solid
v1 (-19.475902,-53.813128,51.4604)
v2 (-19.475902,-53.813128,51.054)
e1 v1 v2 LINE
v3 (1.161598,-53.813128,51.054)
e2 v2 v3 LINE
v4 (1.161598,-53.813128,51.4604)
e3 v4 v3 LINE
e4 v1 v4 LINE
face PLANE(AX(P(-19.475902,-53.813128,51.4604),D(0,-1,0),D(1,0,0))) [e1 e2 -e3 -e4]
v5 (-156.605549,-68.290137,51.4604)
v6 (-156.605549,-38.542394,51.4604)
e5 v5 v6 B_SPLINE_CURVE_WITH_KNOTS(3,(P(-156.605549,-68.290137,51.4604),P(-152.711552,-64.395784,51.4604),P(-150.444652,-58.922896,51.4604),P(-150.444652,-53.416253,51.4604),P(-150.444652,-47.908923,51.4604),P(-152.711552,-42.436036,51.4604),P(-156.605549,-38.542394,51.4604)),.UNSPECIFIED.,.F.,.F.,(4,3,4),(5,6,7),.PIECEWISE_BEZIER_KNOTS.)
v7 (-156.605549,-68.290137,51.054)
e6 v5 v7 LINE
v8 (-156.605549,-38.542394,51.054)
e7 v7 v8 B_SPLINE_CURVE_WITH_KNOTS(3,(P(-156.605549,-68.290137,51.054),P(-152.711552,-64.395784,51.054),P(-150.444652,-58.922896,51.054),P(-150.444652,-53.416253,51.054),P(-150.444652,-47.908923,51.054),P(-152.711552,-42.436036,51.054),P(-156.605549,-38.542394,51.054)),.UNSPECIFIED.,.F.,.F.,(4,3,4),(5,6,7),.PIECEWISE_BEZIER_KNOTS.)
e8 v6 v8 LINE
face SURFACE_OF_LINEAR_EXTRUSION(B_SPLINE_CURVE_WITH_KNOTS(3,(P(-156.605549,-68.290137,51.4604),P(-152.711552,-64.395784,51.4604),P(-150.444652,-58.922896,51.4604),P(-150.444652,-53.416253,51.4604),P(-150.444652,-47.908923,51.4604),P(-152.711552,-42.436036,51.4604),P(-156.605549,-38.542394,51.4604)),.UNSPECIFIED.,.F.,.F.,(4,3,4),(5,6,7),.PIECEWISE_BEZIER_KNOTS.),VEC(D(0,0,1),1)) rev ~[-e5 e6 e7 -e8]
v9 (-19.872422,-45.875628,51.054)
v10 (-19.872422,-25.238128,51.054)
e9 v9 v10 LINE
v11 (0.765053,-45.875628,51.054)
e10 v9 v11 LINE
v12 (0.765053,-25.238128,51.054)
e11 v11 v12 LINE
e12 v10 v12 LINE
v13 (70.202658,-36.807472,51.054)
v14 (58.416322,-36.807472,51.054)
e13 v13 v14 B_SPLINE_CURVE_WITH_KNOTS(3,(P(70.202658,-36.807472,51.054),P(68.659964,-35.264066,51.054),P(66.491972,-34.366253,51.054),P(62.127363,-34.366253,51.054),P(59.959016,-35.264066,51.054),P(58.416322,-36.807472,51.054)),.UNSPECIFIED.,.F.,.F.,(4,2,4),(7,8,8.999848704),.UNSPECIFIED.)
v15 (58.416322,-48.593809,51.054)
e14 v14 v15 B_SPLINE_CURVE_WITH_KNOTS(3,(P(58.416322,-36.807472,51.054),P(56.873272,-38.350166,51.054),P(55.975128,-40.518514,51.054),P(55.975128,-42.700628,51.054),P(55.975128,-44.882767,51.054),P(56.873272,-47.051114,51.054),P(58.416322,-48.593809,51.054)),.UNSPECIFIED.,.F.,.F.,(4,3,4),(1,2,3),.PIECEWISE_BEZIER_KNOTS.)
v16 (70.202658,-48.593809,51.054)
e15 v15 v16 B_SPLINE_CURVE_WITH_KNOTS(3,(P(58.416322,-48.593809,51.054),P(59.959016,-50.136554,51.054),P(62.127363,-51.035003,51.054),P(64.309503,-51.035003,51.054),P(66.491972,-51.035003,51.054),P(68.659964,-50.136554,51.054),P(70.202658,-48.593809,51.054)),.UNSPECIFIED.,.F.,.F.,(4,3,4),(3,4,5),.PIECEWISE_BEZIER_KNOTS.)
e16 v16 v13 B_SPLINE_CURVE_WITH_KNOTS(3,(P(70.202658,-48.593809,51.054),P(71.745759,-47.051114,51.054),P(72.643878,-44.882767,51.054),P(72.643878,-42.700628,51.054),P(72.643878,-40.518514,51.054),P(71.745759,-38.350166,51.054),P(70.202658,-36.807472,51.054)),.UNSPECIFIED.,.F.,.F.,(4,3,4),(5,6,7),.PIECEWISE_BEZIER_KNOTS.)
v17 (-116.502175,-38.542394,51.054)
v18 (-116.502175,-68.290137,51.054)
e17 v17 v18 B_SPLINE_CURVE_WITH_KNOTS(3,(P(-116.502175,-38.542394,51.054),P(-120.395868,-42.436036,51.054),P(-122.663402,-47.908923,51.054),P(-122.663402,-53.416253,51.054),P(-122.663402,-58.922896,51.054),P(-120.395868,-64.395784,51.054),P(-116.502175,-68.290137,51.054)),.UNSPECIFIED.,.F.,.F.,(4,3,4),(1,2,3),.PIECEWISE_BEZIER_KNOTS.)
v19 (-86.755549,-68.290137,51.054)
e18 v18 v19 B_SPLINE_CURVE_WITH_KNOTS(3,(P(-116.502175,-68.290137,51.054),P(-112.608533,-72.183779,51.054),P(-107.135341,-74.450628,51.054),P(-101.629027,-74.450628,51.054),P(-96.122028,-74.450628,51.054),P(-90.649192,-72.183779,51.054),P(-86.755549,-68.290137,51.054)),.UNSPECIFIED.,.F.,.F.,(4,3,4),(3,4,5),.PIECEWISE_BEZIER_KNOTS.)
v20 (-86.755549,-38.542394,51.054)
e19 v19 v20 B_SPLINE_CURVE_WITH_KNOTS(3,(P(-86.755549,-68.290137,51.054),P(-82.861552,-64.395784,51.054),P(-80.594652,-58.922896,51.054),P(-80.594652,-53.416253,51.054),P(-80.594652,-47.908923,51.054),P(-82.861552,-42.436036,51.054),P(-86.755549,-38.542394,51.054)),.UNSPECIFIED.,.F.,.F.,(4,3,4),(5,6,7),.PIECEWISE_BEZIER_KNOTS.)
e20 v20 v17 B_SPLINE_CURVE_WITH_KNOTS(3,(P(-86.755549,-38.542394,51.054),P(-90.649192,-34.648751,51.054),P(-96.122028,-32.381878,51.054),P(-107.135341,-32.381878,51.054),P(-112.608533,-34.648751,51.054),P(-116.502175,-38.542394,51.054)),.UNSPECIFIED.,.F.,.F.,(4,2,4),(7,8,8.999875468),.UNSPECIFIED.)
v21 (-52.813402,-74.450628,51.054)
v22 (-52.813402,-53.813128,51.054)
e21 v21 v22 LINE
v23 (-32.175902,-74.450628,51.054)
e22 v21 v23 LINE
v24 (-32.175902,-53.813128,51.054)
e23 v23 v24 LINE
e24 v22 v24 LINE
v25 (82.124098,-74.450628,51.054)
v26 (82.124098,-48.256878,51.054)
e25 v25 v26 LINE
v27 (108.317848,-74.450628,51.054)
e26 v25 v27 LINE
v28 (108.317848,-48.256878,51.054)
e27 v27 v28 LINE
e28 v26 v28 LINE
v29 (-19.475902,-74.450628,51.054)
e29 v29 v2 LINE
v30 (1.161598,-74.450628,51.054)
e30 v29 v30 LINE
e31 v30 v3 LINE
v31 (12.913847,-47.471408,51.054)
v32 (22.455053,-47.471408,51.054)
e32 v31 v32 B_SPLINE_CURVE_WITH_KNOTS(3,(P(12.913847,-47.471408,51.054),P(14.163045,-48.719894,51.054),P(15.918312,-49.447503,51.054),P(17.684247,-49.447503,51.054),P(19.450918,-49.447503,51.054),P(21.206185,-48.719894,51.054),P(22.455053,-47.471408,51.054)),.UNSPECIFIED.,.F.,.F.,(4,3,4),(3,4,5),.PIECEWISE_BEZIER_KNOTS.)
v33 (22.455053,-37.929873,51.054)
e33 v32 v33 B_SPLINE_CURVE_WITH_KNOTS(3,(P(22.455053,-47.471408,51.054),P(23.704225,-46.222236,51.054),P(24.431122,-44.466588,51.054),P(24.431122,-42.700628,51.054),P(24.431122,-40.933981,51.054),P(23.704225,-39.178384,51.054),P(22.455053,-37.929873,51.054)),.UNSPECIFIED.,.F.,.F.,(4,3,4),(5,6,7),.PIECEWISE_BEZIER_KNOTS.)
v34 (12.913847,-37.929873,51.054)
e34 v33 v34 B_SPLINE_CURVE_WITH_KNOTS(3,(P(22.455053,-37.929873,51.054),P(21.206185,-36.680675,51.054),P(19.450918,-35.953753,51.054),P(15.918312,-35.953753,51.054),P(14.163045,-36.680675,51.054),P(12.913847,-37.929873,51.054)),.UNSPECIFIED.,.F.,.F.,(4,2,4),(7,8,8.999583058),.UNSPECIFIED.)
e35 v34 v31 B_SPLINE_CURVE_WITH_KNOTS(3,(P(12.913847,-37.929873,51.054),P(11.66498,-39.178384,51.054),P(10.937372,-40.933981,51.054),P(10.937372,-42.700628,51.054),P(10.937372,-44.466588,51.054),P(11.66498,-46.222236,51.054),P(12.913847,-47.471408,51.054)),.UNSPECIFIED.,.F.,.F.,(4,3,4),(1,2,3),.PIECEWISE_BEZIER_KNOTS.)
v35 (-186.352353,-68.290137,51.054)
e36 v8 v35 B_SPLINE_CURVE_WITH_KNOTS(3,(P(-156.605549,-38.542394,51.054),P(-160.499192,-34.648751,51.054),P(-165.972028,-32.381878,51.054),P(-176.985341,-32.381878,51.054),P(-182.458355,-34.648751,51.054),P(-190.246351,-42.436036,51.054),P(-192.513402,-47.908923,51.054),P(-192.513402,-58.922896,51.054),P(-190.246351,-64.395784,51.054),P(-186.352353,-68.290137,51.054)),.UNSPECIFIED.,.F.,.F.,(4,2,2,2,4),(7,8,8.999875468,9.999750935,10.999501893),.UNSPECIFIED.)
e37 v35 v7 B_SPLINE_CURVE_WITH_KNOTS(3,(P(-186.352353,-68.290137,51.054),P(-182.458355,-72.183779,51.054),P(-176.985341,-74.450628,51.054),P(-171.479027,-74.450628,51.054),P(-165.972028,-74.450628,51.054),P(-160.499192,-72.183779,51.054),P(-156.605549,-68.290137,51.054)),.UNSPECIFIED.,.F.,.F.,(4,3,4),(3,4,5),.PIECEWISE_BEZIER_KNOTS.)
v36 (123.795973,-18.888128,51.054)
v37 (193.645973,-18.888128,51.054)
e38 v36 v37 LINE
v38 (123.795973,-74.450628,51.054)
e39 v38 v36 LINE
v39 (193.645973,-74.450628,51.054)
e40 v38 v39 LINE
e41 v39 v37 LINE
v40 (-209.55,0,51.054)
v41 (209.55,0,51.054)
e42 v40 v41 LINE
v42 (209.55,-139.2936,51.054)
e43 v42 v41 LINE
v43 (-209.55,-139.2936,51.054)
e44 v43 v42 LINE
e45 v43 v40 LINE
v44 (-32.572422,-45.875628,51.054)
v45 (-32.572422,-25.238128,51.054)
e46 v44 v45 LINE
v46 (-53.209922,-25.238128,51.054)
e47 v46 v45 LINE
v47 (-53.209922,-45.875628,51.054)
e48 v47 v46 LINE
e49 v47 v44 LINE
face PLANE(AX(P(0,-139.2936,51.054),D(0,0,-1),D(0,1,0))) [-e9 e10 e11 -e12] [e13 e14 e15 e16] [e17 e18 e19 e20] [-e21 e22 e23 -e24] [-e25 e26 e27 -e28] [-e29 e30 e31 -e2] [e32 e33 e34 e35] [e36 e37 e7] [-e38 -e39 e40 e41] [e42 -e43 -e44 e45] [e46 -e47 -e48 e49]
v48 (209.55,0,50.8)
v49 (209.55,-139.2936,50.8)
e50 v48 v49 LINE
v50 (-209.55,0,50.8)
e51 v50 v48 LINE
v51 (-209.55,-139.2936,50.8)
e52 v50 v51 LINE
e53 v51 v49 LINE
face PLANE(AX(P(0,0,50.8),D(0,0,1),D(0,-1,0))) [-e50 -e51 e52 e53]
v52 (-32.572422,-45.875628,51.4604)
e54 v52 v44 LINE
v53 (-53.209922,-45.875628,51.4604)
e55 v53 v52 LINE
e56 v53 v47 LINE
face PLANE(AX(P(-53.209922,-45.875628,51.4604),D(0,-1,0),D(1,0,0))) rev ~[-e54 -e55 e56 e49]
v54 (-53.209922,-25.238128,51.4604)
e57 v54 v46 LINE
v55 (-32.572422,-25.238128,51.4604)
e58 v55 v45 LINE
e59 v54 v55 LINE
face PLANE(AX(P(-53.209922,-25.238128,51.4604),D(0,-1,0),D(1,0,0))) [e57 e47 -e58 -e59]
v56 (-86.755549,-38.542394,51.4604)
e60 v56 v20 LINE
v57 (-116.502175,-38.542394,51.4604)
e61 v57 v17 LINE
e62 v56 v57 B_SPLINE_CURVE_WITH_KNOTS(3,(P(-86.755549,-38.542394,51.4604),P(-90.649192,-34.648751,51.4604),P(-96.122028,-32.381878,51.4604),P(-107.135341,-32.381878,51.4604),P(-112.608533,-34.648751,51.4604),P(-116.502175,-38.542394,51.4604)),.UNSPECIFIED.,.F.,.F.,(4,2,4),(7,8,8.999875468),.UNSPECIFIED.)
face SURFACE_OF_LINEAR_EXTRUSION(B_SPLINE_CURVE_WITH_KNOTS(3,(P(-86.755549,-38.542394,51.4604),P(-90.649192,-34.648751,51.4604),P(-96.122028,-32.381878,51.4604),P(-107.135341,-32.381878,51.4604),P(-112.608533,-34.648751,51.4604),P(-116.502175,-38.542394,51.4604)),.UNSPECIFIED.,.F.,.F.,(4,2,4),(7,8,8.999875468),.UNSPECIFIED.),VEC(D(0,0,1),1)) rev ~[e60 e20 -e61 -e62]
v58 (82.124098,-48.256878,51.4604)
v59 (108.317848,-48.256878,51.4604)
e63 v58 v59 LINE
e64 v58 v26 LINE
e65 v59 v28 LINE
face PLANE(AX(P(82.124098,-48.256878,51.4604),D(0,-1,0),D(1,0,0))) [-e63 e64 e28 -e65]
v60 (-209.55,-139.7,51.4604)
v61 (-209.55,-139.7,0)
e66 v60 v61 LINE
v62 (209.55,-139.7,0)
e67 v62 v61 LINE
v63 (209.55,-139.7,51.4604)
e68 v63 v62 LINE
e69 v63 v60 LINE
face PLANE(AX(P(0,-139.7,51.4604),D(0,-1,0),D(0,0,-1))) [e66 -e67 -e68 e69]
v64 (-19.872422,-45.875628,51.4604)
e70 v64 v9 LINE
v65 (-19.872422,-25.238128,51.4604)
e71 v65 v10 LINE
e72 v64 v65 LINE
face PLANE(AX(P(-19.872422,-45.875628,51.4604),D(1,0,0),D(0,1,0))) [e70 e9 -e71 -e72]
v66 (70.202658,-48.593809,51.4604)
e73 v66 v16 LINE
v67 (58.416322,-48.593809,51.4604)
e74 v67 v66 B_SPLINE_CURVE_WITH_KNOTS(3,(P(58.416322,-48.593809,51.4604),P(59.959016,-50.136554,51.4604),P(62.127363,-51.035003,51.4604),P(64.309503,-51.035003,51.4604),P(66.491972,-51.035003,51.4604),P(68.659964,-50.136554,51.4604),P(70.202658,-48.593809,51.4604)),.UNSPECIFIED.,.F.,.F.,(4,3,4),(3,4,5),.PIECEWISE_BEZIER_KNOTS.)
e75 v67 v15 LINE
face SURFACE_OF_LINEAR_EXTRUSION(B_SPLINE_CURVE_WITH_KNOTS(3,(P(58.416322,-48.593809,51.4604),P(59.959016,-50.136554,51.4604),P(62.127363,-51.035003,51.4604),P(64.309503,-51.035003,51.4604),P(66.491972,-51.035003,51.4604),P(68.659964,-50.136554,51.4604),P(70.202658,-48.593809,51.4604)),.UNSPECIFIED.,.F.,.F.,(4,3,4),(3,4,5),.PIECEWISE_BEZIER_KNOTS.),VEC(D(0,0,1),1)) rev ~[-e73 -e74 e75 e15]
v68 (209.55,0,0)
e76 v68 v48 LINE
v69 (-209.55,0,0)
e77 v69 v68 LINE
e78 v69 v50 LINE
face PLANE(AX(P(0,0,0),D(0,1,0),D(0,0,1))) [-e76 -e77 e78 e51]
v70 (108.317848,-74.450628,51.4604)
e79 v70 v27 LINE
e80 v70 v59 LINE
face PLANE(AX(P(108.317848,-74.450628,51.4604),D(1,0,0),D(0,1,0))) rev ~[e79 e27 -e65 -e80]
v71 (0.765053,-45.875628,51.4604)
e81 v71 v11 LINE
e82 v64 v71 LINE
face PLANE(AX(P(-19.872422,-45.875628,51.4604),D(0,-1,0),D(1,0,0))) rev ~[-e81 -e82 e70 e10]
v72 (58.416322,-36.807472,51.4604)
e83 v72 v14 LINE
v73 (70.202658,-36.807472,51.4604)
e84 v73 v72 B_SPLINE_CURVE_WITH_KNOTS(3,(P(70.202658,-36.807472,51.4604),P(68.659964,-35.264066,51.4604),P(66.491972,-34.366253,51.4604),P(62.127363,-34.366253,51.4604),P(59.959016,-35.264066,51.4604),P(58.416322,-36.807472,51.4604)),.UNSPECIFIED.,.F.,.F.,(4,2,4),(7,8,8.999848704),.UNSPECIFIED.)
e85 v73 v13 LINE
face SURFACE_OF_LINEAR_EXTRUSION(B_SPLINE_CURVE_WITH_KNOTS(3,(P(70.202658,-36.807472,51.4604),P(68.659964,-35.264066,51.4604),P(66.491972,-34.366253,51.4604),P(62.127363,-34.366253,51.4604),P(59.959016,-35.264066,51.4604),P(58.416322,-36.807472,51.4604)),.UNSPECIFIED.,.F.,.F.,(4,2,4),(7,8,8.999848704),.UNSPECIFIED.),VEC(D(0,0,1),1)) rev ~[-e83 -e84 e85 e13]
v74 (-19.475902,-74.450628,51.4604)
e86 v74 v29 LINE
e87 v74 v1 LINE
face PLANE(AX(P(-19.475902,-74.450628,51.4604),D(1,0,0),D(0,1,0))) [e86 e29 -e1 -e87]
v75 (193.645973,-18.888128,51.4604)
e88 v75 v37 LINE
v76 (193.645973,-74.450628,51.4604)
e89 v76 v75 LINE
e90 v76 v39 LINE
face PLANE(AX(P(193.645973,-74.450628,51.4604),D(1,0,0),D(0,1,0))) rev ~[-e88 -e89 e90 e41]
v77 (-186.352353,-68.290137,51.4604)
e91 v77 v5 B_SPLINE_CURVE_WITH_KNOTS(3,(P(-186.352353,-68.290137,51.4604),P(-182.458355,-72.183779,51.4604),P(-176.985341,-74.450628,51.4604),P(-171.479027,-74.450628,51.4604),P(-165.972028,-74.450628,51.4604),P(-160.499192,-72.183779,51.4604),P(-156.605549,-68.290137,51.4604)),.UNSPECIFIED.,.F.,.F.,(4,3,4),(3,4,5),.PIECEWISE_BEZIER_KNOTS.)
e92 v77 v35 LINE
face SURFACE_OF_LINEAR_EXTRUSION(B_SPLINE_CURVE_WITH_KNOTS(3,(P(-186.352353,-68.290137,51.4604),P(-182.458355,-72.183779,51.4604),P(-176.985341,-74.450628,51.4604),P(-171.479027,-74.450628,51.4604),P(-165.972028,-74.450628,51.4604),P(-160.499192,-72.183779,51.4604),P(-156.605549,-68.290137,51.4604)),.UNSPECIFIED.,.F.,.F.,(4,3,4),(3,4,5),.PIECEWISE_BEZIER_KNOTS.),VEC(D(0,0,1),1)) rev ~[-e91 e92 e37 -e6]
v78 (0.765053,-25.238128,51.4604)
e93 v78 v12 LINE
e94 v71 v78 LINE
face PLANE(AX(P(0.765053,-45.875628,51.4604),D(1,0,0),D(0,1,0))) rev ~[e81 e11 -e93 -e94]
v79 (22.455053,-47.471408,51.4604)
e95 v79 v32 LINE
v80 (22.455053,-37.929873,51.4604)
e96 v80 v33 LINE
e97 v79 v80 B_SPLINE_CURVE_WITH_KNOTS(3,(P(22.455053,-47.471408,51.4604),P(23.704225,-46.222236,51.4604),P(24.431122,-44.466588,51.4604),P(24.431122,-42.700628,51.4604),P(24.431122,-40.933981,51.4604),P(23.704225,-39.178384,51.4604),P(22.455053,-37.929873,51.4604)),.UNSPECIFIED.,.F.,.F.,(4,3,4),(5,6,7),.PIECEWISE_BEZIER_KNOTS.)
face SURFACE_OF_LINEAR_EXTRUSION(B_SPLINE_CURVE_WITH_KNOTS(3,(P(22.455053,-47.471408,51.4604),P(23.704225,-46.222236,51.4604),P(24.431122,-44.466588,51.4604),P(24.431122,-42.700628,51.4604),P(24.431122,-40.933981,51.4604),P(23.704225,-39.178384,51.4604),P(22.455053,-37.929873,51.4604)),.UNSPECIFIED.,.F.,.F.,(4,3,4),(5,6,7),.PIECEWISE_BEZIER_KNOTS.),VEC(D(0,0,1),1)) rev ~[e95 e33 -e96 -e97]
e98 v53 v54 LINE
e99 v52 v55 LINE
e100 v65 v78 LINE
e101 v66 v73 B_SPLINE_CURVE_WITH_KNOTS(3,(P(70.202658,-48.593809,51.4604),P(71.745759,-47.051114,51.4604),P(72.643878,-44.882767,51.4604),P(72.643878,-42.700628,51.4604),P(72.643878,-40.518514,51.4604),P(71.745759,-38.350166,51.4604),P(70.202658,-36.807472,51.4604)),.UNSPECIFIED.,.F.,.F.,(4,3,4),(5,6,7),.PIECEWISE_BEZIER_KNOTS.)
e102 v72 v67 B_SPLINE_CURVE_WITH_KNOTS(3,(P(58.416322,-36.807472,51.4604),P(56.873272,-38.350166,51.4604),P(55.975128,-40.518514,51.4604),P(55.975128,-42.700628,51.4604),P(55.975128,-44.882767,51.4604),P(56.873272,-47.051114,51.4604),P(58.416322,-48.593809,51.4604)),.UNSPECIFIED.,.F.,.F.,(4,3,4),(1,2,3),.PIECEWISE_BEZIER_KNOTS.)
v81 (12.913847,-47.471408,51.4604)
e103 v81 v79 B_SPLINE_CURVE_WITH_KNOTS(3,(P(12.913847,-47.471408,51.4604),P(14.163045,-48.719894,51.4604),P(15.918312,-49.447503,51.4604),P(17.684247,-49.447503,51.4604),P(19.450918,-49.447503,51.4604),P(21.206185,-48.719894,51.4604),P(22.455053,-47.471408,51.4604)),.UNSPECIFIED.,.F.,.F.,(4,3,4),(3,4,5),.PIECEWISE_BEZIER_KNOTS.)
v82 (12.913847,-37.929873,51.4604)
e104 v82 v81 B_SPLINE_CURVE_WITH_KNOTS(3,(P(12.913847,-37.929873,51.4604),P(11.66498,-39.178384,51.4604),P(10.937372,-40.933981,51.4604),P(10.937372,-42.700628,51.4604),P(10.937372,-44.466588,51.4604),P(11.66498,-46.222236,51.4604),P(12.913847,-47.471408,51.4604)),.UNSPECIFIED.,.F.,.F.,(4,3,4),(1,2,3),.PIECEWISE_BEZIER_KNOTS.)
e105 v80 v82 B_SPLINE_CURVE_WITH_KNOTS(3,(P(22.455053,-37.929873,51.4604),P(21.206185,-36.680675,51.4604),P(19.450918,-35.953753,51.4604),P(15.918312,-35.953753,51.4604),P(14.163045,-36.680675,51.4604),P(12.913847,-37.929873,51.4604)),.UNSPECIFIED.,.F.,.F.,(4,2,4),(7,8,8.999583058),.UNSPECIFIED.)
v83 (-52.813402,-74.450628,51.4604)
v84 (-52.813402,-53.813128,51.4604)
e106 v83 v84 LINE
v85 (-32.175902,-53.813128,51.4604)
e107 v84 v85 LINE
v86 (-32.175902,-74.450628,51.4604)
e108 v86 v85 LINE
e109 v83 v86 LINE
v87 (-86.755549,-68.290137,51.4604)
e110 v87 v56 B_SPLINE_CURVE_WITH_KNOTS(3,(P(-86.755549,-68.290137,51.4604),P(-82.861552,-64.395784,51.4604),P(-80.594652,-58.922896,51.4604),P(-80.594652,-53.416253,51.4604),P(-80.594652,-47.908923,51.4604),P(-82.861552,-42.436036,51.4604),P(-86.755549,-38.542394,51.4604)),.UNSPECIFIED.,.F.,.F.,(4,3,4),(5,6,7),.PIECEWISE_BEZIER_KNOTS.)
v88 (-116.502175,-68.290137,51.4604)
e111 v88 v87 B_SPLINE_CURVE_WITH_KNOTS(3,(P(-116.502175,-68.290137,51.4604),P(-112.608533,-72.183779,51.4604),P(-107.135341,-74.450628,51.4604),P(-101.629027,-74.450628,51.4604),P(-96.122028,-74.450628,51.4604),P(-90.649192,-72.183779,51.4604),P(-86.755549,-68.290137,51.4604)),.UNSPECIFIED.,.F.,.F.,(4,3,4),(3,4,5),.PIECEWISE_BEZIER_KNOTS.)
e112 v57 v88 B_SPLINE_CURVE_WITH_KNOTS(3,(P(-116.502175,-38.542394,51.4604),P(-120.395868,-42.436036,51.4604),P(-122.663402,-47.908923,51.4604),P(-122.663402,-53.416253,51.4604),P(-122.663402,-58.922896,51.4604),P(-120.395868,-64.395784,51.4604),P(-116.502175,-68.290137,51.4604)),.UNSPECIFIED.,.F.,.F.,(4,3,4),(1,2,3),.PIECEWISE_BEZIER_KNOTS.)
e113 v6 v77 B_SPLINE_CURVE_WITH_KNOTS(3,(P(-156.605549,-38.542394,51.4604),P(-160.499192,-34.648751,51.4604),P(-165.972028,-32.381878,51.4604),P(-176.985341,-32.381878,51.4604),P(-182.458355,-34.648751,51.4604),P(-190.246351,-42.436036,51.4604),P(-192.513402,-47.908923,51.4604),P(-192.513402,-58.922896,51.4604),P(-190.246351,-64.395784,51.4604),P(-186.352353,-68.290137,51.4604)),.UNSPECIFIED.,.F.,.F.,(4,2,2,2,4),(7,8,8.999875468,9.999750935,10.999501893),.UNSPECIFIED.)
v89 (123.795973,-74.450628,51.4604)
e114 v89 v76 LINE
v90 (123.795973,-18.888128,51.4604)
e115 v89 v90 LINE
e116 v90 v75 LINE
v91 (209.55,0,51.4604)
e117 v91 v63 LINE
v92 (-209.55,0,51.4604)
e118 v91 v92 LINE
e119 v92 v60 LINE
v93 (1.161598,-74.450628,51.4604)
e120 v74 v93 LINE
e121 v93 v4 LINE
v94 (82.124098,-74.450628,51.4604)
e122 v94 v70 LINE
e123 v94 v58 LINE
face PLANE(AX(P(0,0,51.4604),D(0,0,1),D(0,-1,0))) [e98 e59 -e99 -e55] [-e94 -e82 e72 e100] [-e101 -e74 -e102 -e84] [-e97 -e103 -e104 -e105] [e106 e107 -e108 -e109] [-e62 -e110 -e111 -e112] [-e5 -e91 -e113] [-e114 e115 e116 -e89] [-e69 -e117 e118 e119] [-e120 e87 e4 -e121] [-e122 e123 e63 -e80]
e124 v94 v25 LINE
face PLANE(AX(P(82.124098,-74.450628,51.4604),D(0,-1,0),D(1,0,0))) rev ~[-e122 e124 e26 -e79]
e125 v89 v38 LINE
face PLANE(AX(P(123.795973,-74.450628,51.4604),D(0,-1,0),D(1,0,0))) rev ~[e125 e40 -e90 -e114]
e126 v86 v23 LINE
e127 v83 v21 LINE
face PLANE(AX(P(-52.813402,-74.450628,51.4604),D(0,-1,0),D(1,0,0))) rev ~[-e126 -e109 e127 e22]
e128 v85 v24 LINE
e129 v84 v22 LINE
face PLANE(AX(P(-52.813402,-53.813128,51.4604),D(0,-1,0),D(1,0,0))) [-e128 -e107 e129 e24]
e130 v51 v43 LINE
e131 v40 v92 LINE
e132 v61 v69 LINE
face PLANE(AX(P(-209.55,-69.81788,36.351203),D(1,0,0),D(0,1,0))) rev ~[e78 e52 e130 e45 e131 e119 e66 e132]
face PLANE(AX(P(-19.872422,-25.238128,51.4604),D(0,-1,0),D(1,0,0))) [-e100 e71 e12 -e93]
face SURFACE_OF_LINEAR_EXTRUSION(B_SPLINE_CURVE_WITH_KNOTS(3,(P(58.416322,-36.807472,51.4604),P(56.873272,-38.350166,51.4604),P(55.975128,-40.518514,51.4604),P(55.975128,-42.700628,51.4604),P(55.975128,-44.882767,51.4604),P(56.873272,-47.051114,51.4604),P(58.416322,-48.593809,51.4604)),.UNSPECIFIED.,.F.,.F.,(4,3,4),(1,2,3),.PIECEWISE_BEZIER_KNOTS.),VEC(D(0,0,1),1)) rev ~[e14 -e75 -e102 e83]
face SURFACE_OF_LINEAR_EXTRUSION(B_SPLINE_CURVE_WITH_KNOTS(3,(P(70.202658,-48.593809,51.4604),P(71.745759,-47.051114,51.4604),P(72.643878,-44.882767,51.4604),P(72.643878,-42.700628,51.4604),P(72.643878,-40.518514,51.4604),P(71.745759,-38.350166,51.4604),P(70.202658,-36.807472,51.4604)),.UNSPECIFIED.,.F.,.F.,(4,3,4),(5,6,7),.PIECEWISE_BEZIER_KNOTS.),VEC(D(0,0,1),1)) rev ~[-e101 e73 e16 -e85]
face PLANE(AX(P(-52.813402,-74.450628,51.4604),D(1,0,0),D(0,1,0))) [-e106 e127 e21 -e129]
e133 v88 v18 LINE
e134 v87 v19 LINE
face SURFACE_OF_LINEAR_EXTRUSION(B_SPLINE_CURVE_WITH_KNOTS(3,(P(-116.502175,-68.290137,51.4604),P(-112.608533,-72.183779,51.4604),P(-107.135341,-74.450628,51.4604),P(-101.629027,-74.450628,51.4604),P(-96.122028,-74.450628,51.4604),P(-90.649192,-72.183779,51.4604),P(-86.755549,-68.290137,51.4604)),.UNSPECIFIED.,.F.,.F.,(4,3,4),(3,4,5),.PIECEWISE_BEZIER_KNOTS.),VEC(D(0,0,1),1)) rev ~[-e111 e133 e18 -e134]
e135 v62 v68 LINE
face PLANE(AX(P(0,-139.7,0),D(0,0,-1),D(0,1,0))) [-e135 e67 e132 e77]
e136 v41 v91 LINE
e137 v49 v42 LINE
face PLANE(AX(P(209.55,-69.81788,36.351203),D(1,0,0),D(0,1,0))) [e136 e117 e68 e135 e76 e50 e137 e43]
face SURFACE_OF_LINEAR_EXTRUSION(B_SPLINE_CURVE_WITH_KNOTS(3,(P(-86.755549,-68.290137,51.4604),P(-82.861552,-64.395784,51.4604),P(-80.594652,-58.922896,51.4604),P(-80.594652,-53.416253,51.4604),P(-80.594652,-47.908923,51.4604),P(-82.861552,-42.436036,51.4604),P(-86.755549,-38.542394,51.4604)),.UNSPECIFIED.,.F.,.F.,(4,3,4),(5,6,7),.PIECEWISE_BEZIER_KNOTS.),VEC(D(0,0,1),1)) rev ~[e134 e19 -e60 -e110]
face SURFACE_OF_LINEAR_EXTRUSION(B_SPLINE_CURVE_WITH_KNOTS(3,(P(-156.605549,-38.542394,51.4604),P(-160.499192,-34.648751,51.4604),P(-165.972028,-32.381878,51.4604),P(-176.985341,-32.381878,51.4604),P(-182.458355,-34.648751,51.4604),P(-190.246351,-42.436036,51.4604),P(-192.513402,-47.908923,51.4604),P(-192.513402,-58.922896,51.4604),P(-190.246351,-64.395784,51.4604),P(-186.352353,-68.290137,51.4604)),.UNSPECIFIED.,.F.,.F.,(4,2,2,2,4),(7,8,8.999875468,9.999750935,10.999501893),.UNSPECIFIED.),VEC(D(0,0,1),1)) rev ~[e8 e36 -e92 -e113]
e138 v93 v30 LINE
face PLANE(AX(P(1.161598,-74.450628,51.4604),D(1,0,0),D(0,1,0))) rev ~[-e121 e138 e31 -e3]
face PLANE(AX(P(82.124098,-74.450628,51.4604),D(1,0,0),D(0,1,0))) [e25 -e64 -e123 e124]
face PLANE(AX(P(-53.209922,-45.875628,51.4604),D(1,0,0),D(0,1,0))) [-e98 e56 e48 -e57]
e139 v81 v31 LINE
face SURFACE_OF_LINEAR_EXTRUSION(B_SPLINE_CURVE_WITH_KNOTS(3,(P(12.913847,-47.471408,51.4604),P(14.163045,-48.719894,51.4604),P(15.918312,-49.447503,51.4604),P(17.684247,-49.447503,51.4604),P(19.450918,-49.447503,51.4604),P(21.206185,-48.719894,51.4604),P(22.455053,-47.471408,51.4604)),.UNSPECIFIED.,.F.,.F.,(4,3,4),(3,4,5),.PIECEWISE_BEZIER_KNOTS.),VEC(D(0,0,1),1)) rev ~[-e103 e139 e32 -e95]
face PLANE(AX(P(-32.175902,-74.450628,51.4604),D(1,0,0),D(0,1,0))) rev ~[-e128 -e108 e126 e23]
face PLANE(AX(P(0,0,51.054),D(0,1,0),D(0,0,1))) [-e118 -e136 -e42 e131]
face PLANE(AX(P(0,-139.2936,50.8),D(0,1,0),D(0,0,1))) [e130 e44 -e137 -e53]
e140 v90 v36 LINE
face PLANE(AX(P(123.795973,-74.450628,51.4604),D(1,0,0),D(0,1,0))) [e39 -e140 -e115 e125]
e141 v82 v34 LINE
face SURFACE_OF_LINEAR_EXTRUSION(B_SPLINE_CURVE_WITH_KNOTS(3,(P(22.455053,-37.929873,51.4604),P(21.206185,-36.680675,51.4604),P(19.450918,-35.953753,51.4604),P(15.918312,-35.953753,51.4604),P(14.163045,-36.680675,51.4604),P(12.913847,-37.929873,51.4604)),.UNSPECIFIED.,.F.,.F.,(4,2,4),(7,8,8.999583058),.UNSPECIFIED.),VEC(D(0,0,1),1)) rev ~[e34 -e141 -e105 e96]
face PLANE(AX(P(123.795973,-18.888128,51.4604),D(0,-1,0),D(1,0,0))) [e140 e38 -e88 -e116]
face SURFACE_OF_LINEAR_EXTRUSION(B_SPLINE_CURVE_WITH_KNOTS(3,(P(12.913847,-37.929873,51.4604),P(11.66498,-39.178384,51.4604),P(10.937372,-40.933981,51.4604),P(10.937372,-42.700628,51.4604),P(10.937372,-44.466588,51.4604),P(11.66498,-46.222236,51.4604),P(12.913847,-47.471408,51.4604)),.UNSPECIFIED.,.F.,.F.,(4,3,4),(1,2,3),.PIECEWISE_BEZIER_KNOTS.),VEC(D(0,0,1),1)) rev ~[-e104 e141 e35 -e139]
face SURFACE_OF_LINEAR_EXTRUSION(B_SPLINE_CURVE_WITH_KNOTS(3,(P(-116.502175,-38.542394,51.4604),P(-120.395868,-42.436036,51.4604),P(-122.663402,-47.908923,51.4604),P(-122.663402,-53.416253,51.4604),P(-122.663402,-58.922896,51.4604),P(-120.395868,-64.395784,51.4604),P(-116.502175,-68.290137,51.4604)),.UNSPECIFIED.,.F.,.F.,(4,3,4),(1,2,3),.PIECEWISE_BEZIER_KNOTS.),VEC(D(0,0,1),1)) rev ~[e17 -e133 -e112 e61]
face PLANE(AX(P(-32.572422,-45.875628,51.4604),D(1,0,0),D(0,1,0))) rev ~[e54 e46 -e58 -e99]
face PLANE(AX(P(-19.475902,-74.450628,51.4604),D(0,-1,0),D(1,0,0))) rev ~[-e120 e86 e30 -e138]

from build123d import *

# Parameters (mm, degrees)
F1_DEPTH = 209.55
F2_W     = 20.6375
F2_H     = 20.6375
F2_W_2   = 20.6374746
F2_W_3   = 69.85
F2_H_2   = 55.5625
F2_W_4   = 26.19375
F2_H_3   = 26.19375
F3_DEPTH = 0.4064


# Not quite as in the source:
# - the dataset's text gives a spline's control points without its knots; the knots are read off the source's solid


with BuildPart() as f1:
    # F0 (on Right) → F1 (new body, symmetric)
    with BuildSketch(Plane.YZ):
        Polygon((-139.7, 0), (0, 0), (0, 50.8), (-139.2936, 50.8), (-139.2936, 51.054), (0, 51.054), (0, 51.4604), (-139.7, 51.4604), align=None)
    extrude(amount=F1_DEPTH, both=True)

    # F2 (on face) → F3 (cut, through all)
    with BuildSketch(Plane.XY.offset(51.4604)):
        with Locations((-42.494652462, -64.131877524)):
            Rectangle(F2_W, F2_H)
        with Locations((-42.891171862, -35.556877524)):
            Rectangle(F2_W, F2_H)
        with Locations((-9.157152462, -64.131877524)):
            Rectangle(F2_W, F2_H)
        with Locations((-9.553684562, -35.556877524)):
            Rectangle(F2_W_2, F2_H)
        with Locations((158.720972538, -46.669377524)):
            Rectangle(F2_W_3, F2_H_2)
        with Locations((95.220972538, -61.353752524)):
            Rectangle(F2_W_4, F2_H_3)
        with BuildLine():
            add(Edge.make_bspline(
                [(22.455052538, -37.929872524), (21.206185338, -36.680675124), (19.450918338, -35.953752524), (17.684246738, -35.953752524)],
                knots=[7, 7, 7, 7, 8, 8, 8, 8], degree=3))
            add(Edge.make_bspline(
                [(17.684246738, -35.953752524), (15.918311738, -35.953752524), (14.163044738, -36.680675124), (12.913847338, -37.929872524)],
                knots=[0, 0, 0, 0, 1, 1, 1, 1], degree=3))
            add(Edge.make_bspline(
                [(12.913847338, -37.929872524), (11.664980138, -39.178384124), (10.937371738, -40.933981324), (10.937371738, -42.700627524), (10.937371738, -44.466587924), (11.664980138, -46.222235924), (12.913847338, -47.471407924)],
                knots=[1, 1, 1, 1, 2, 2, 2, 3, 3, 3, 3], degree=3))
            add(Edge.make_bspline(
                [(12.913847338, -47.471407924), (14.163044738, -48.719894124), (15.918311738, -49.447502524), (17.684246738, -49.447502524), (19.450918338, -49.447502524), (21.206185338, -48.719894124), (22.455052538, -47.471407924)],
                knots=[3, 3, 3, 3, 4, 4, 4, 5, 5, 5, 5], degree=3))
            add(Edge.make_bspline(
                [(22.455052538, -47.471407924), (23.704224538, -46.222235924), (24.431121738, -44.466587924), (24.431121738, -42.700627524), (24.431121738, -40.933981324), (23.704224538, -39.178384124), (22.455052538, -37.929872524)],
                knots=[5, 5, 5, 5, 6, 6, 6, 7, 7, 7, 7], degree=3))
        make_face()
        with BuildLine():
            add(Edge.make_bspline(
                [(-86.755549462, -38.542393524), (-90.649191662, -34.648751324), (-96.122028062, -32.381877524), (-101.629027462, -32.381877524)],
                knots=[7, 7, 7, 7, 8, 8, 8, 8], degree=3))
            add(Edge.make_bspline(
                [(-101.629027462, -32.381877524), (-107.135341062, -32.381877524), (-112.608533062, -34.648751324), (-116.502175262, -38.542393524)],
                knots=[0, 0, 0, 0, 1, 1, 1, 1], degree=3))
            add(Edge.make_bspline(
                [(-116.502175262, -38.542393524), (-120.395868262, -42.436035724), (-122.663402462, -47.908922924), (-122.663402462, -53.416252524), (-122.663402462, -58.922896324), (-120.395868262, -64.395783524), (-116.502175262, -68.290136924)],
                knots=[1, 1, 1, 1, 2, 2, 2, 3, 3, 3, 3], degree=3))
            add(Edge.make_bspline(
                [(-116.502175262, -68.290136924), (-112.608533062, -72.183779124), (-107.135341062, -74.450627524), (-101.629027462, -74.450627524), (-96.122028062, -74.450627524), (-90.649191662, -72.183779124), (-86.755549462, -68.290136924)],
                knots=[3, 3, 3, 3, 4, 4, 4, 5, 5, 5, 5], degree=3))
            add(Edge.make_bspline(
                [(-86.755549462, -68.290136924), (-82.861551662, -64.395783524), (-80.594652462, -58.922896324), (-80.594652462, -53.416252524), (-80.594652462, -47.908922924), (-82.861551662, -42.436035724), (-86.755549462, -38.542393524)],
                knots=[5, 5, 5, 5, 6, 6, 6, 7, 7, 7, 7], degree=3))
        make_face()
        with BuildLine():
            add(Edge.make_bspline(
                [(-156.605549462, -38.542393524), (-160.499191662, -34.648751324), (-165.972028062, -32.381877524), (-171.479027462, -32.381877524)],
                knots=[7, 7, 7, 7, 8, 8, 8, 8], degree=3))
            add(Edge.make_bspline(
                [(-171.479027462, -32.381877524), (-176.985341062, -32.381877524), (-182.458355262, -34.648751324), (-186.352353062, -38.542393524), (-190.246350862, -42.436035724), (-192.513402462, -47.908922924), (-192.513402462, -53.416252524), (-192.513402462, -58.922896324), (-190.246350862, -64.395783524), (-186.352353062, -68.290136924)],
                knots=[0, 0, 0, 0, 1, 1, 1, 2, 2, 2, 3, 3, 3, 3], degree=3))
            add(Edge.make_bspline(
                [(-186.352353062, -68.290136924), (-182.458355262, -72.183779124), (-176.985341062, -74.450627524), (-171.479027462, -74.450627524), (-165.972028062, -74.450627524), (-160.499191662, -72.183779124), (-156.605549462, -68.290136924)],
                knots=[3, 3, 3, 3, 4, 4, 4, 5, 5, 5, 5], degree=3))
            add(Edge.make_bspline(
                [(-156.605549462, -68.290136924), (-152.711551662, -64.395783524), (-150.444652462, -58.922896324), (-150.444652462, -53.416252524), (-150.444652462, -47.908922924), (-152.711551662, -42.436035724), (-156.605549462, -38.542393524)],
                knots=[5, 5, 5, 5, 6, 6, 6, 7, 7, 7, 7], degree=3))
        make_face()
        with BuildLine():
            add(Edge.make_bspline(
                [(70.202658338, -36.807471924), (68.659963938, -35.264066324), (66.491972338, -34.366252524), (64.309502738, -34.366252524)],
                knots=[7, 7, 7, 7, 8, 8, 8, 8], degree=3))
            add(Edge.make_bspline(
                [(64.309502738, -34.366252524), (62.127363338, -34.366252524), (59.959016138, -35.264066324), (58.416321738, -36.807471924)],
                knots=[0, 0, 0, 0, 1, 1, 1, 1], degree=3))
            add(Edge.make_bspline(
                [(58.416321738, -36.807471924), (56.873271738, -38.350166324), (55.975127738, -40.518513524), (55.975127738, -42.700627524), (55.975127738, -44.882766924), (56.873271738, -47.051114124), (58.416321738, -48.593808524)],
                knots=[1, 1, 1, 1, 2, 2, 2, 3, 3, 3, 3], degree=3))
            add(Edge.make_bspline(
                [(58.416321738, -48.593808524), (59.959016138, -50.136553724), (62.127363338, -51.035002524), (64.309502738, -51.035002524), (66.491972338, -51.035002524), (68.659963938, -50.136553724), (70.202658338, -48.593808524)],
                knots=[3, 3, 3, 3, 4, 4, 4, 5, 5, 5, 5], degree=3))
            add(Edge.make_bspline(
                [(70.202658338, -48.593808524), (71.745759138, -47.051114124), (72.643877738, -44.882766924), (72.643877738, -42.700627524), (72.643877738, -40.518513524), (71.745759138, -38.350166324), (70.202658338, -36.807471924)],
                knots=[5, 5, 5, 5, 6, 6, 6, 7, 7, 7, 7], degree=3))
        make_face()
    extrude(amount=-F3_DEPTH, mode=Mode.SUBTRACT)


solid = f1.part
